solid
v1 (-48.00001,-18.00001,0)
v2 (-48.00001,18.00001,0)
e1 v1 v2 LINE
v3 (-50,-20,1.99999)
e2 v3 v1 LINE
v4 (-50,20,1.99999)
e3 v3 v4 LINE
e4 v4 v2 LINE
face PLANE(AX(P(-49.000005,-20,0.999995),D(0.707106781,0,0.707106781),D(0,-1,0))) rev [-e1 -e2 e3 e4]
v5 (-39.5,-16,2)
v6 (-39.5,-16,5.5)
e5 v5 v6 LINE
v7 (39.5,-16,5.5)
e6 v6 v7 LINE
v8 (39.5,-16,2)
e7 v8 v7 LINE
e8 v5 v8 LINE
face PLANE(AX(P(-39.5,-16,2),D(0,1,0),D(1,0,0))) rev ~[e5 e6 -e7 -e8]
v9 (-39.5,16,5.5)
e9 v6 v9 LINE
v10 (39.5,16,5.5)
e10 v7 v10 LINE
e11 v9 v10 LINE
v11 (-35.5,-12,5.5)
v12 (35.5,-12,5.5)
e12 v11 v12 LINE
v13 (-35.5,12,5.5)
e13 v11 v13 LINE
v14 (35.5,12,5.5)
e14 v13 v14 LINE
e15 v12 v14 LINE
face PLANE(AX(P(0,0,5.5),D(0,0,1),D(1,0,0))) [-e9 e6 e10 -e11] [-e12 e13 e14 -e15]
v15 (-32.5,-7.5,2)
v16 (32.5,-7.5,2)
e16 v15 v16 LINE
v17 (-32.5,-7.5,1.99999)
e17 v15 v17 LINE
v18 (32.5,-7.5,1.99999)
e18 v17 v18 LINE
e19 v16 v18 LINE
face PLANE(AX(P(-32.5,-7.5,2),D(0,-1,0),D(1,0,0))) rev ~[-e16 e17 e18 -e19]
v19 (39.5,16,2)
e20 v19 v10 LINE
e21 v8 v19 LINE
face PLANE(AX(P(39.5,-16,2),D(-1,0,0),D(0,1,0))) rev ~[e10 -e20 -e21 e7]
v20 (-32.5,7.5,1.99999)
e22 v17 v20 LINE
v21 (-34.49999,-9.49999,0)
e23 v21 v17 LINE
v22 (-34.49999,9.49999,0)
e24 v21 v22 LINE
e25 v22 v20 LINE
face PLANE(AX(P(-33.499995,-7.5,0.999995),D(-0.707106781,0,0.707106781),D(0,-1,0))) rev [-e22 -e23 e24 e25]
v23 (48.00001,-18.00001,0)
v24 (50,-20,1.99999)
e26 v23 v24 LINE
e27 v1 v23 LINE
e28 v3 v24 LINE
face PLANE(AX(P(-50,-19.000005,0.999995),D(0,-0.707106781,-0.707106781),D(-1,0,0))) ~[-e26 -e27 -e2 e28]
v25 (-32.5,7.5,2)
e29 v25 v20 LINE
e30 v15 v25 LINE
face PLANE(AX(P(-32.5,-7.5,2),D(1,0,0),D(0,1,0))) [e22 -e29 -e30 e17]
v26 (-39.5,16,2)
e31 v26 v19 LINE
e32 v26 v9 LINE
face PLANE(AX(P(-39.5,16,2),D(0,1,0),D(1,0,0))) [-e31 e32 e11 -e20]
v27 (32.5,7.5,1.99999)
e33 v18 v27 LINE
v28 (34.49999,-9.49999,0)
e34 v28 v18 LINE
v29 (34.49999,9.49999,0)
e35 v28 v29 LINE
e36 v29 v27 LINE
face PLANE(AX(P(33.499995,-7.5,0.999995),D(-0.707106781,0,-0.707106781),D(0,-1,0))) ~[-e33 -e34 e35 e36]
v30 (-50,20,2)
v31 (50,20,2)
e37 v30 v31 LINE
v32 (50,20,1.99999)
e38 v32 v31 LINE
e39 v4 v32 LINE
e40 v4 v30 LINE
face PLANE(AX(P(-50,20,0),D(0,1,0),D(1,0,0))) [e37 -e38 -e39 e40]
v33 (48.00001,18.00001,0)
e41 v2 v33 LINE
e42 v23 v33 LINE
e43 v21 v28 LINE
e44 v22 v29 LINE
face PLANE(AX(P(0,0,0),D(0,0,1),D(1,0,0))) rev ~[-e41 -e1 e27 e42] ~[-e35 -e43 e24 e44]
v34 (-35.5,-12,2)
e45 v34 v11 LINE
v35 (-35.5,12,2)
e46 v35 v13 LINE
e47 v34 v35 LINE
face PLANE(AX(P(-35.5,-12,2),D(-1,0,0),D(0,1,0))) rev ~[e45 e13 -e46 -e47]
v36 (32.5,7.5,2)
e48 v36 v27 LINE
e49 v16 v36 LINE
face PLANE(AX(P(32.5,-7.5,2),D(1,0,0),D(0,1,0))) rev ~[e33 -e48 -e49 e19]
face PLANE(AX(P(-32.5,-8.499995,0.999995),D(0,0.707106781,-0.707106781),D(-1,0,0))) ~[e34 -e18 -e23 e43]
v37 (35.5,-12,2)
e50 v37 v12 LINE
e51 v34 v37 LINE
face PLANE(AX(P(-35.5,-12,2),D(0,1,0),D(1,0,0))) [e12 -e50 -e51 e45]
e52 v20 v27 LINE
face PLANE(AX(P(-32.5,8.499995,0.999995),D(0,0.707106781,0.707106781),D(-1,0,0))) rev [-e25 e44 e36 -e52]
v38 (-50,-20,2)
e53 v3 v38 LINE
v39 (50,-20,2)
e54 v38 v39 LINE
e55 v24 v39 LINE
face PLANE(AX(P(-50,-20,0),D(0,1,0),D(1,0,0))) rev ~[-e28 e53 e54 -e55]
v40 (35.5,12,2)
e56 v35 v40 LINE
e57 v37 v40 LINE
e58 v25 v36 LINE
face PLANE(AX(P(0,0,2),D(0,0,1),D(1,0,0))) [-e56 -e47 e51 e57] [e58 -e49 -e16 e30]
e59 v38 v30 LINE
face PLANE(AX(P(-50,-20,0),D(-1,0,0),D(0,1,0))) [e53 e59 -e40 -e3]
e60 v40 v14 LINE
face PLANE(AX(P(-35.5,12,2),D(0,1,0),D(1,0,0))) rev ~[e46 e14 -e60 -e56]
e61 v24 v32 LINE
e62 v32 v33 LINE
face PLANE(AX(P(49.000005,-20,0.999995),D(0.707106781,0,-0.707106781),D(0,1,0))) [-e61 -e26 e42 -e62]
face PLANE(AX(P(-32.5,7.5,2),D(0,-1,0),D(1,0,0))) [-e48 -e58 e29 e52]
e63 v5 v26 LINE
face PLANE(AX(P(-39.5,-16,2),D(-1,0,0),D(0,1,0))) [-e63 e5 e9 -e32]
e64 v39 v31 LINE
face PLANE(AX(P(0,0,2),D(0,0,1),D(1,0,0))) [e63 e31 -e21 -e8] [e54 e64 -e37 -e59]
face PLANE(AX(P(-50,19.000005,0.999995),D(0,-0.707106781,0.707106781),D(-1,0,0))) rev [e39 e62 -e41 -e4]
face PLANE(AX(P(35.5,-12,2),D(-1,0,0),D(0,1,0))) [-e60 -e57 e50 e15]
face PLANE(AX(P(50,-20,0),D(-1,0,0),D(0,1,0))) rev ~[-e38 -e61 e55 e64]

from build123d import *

# Parameters (mm, degrees)
F0_W     = 100
F0_H     = 40
F1_DEPTH = 2
F2_W     = 79
F2_H     = 32
F2_W_2   = 71
F2_H_2   = 24
F3_DEPTH = 3.5
F4_W     = 65
F4_H     = 15
F5_DEPTH = 2
F6_SIZE  = 1.99999


# Not quite as in the source:
# - a fillet or chamfer is up to 0.001 mm smaller than in the source, because OpenCascade refuses the exact size


with BuildPart() as f1:
    # F0 (on Top) → F1 (new body)
    with BuildSketch(Plane.XY):
        Rectangle(F0_W, F0_H)
    extrude(amount=F1_DEPTH)

    # F2 (on face) → F3 (join)
    with BuildSketch(Plane.XY.offset(2)):
        Rectangle(F2_W, F2_H)
        Rectangle(F2_W_2, F2_H_2, mode=Mode.SUBTRACT)
    extrude(amount=F3_DEPTH)

    # F4 (on face) → F5 (cut, through all)
    with BuildSketch(Plane.XY.offset(2)):
        Rectangle(F4_W, F4_H)
    extrude(amount=-F5_DEPTH, mode=Mode.SUBTRACT)

    # F6 (size 2 in the source; OpenCascade refuses exactly that, so slightly less here)
    f6_edges = [f1.edges().sort_by_distance(p)[0] for p in [
        (32.5, 0, 0),
        (0, 7.5, 0),
        (-32.5, 0, 0),
        (0, -7.5, 0),
        (0, 20, 0),
        (50, 0, 0),
        (0, -20, 0),
        (-50, 0, 0),
    ]]
    chamfer(f6_edges, length=F6_SIZE)


solid = f1.part
